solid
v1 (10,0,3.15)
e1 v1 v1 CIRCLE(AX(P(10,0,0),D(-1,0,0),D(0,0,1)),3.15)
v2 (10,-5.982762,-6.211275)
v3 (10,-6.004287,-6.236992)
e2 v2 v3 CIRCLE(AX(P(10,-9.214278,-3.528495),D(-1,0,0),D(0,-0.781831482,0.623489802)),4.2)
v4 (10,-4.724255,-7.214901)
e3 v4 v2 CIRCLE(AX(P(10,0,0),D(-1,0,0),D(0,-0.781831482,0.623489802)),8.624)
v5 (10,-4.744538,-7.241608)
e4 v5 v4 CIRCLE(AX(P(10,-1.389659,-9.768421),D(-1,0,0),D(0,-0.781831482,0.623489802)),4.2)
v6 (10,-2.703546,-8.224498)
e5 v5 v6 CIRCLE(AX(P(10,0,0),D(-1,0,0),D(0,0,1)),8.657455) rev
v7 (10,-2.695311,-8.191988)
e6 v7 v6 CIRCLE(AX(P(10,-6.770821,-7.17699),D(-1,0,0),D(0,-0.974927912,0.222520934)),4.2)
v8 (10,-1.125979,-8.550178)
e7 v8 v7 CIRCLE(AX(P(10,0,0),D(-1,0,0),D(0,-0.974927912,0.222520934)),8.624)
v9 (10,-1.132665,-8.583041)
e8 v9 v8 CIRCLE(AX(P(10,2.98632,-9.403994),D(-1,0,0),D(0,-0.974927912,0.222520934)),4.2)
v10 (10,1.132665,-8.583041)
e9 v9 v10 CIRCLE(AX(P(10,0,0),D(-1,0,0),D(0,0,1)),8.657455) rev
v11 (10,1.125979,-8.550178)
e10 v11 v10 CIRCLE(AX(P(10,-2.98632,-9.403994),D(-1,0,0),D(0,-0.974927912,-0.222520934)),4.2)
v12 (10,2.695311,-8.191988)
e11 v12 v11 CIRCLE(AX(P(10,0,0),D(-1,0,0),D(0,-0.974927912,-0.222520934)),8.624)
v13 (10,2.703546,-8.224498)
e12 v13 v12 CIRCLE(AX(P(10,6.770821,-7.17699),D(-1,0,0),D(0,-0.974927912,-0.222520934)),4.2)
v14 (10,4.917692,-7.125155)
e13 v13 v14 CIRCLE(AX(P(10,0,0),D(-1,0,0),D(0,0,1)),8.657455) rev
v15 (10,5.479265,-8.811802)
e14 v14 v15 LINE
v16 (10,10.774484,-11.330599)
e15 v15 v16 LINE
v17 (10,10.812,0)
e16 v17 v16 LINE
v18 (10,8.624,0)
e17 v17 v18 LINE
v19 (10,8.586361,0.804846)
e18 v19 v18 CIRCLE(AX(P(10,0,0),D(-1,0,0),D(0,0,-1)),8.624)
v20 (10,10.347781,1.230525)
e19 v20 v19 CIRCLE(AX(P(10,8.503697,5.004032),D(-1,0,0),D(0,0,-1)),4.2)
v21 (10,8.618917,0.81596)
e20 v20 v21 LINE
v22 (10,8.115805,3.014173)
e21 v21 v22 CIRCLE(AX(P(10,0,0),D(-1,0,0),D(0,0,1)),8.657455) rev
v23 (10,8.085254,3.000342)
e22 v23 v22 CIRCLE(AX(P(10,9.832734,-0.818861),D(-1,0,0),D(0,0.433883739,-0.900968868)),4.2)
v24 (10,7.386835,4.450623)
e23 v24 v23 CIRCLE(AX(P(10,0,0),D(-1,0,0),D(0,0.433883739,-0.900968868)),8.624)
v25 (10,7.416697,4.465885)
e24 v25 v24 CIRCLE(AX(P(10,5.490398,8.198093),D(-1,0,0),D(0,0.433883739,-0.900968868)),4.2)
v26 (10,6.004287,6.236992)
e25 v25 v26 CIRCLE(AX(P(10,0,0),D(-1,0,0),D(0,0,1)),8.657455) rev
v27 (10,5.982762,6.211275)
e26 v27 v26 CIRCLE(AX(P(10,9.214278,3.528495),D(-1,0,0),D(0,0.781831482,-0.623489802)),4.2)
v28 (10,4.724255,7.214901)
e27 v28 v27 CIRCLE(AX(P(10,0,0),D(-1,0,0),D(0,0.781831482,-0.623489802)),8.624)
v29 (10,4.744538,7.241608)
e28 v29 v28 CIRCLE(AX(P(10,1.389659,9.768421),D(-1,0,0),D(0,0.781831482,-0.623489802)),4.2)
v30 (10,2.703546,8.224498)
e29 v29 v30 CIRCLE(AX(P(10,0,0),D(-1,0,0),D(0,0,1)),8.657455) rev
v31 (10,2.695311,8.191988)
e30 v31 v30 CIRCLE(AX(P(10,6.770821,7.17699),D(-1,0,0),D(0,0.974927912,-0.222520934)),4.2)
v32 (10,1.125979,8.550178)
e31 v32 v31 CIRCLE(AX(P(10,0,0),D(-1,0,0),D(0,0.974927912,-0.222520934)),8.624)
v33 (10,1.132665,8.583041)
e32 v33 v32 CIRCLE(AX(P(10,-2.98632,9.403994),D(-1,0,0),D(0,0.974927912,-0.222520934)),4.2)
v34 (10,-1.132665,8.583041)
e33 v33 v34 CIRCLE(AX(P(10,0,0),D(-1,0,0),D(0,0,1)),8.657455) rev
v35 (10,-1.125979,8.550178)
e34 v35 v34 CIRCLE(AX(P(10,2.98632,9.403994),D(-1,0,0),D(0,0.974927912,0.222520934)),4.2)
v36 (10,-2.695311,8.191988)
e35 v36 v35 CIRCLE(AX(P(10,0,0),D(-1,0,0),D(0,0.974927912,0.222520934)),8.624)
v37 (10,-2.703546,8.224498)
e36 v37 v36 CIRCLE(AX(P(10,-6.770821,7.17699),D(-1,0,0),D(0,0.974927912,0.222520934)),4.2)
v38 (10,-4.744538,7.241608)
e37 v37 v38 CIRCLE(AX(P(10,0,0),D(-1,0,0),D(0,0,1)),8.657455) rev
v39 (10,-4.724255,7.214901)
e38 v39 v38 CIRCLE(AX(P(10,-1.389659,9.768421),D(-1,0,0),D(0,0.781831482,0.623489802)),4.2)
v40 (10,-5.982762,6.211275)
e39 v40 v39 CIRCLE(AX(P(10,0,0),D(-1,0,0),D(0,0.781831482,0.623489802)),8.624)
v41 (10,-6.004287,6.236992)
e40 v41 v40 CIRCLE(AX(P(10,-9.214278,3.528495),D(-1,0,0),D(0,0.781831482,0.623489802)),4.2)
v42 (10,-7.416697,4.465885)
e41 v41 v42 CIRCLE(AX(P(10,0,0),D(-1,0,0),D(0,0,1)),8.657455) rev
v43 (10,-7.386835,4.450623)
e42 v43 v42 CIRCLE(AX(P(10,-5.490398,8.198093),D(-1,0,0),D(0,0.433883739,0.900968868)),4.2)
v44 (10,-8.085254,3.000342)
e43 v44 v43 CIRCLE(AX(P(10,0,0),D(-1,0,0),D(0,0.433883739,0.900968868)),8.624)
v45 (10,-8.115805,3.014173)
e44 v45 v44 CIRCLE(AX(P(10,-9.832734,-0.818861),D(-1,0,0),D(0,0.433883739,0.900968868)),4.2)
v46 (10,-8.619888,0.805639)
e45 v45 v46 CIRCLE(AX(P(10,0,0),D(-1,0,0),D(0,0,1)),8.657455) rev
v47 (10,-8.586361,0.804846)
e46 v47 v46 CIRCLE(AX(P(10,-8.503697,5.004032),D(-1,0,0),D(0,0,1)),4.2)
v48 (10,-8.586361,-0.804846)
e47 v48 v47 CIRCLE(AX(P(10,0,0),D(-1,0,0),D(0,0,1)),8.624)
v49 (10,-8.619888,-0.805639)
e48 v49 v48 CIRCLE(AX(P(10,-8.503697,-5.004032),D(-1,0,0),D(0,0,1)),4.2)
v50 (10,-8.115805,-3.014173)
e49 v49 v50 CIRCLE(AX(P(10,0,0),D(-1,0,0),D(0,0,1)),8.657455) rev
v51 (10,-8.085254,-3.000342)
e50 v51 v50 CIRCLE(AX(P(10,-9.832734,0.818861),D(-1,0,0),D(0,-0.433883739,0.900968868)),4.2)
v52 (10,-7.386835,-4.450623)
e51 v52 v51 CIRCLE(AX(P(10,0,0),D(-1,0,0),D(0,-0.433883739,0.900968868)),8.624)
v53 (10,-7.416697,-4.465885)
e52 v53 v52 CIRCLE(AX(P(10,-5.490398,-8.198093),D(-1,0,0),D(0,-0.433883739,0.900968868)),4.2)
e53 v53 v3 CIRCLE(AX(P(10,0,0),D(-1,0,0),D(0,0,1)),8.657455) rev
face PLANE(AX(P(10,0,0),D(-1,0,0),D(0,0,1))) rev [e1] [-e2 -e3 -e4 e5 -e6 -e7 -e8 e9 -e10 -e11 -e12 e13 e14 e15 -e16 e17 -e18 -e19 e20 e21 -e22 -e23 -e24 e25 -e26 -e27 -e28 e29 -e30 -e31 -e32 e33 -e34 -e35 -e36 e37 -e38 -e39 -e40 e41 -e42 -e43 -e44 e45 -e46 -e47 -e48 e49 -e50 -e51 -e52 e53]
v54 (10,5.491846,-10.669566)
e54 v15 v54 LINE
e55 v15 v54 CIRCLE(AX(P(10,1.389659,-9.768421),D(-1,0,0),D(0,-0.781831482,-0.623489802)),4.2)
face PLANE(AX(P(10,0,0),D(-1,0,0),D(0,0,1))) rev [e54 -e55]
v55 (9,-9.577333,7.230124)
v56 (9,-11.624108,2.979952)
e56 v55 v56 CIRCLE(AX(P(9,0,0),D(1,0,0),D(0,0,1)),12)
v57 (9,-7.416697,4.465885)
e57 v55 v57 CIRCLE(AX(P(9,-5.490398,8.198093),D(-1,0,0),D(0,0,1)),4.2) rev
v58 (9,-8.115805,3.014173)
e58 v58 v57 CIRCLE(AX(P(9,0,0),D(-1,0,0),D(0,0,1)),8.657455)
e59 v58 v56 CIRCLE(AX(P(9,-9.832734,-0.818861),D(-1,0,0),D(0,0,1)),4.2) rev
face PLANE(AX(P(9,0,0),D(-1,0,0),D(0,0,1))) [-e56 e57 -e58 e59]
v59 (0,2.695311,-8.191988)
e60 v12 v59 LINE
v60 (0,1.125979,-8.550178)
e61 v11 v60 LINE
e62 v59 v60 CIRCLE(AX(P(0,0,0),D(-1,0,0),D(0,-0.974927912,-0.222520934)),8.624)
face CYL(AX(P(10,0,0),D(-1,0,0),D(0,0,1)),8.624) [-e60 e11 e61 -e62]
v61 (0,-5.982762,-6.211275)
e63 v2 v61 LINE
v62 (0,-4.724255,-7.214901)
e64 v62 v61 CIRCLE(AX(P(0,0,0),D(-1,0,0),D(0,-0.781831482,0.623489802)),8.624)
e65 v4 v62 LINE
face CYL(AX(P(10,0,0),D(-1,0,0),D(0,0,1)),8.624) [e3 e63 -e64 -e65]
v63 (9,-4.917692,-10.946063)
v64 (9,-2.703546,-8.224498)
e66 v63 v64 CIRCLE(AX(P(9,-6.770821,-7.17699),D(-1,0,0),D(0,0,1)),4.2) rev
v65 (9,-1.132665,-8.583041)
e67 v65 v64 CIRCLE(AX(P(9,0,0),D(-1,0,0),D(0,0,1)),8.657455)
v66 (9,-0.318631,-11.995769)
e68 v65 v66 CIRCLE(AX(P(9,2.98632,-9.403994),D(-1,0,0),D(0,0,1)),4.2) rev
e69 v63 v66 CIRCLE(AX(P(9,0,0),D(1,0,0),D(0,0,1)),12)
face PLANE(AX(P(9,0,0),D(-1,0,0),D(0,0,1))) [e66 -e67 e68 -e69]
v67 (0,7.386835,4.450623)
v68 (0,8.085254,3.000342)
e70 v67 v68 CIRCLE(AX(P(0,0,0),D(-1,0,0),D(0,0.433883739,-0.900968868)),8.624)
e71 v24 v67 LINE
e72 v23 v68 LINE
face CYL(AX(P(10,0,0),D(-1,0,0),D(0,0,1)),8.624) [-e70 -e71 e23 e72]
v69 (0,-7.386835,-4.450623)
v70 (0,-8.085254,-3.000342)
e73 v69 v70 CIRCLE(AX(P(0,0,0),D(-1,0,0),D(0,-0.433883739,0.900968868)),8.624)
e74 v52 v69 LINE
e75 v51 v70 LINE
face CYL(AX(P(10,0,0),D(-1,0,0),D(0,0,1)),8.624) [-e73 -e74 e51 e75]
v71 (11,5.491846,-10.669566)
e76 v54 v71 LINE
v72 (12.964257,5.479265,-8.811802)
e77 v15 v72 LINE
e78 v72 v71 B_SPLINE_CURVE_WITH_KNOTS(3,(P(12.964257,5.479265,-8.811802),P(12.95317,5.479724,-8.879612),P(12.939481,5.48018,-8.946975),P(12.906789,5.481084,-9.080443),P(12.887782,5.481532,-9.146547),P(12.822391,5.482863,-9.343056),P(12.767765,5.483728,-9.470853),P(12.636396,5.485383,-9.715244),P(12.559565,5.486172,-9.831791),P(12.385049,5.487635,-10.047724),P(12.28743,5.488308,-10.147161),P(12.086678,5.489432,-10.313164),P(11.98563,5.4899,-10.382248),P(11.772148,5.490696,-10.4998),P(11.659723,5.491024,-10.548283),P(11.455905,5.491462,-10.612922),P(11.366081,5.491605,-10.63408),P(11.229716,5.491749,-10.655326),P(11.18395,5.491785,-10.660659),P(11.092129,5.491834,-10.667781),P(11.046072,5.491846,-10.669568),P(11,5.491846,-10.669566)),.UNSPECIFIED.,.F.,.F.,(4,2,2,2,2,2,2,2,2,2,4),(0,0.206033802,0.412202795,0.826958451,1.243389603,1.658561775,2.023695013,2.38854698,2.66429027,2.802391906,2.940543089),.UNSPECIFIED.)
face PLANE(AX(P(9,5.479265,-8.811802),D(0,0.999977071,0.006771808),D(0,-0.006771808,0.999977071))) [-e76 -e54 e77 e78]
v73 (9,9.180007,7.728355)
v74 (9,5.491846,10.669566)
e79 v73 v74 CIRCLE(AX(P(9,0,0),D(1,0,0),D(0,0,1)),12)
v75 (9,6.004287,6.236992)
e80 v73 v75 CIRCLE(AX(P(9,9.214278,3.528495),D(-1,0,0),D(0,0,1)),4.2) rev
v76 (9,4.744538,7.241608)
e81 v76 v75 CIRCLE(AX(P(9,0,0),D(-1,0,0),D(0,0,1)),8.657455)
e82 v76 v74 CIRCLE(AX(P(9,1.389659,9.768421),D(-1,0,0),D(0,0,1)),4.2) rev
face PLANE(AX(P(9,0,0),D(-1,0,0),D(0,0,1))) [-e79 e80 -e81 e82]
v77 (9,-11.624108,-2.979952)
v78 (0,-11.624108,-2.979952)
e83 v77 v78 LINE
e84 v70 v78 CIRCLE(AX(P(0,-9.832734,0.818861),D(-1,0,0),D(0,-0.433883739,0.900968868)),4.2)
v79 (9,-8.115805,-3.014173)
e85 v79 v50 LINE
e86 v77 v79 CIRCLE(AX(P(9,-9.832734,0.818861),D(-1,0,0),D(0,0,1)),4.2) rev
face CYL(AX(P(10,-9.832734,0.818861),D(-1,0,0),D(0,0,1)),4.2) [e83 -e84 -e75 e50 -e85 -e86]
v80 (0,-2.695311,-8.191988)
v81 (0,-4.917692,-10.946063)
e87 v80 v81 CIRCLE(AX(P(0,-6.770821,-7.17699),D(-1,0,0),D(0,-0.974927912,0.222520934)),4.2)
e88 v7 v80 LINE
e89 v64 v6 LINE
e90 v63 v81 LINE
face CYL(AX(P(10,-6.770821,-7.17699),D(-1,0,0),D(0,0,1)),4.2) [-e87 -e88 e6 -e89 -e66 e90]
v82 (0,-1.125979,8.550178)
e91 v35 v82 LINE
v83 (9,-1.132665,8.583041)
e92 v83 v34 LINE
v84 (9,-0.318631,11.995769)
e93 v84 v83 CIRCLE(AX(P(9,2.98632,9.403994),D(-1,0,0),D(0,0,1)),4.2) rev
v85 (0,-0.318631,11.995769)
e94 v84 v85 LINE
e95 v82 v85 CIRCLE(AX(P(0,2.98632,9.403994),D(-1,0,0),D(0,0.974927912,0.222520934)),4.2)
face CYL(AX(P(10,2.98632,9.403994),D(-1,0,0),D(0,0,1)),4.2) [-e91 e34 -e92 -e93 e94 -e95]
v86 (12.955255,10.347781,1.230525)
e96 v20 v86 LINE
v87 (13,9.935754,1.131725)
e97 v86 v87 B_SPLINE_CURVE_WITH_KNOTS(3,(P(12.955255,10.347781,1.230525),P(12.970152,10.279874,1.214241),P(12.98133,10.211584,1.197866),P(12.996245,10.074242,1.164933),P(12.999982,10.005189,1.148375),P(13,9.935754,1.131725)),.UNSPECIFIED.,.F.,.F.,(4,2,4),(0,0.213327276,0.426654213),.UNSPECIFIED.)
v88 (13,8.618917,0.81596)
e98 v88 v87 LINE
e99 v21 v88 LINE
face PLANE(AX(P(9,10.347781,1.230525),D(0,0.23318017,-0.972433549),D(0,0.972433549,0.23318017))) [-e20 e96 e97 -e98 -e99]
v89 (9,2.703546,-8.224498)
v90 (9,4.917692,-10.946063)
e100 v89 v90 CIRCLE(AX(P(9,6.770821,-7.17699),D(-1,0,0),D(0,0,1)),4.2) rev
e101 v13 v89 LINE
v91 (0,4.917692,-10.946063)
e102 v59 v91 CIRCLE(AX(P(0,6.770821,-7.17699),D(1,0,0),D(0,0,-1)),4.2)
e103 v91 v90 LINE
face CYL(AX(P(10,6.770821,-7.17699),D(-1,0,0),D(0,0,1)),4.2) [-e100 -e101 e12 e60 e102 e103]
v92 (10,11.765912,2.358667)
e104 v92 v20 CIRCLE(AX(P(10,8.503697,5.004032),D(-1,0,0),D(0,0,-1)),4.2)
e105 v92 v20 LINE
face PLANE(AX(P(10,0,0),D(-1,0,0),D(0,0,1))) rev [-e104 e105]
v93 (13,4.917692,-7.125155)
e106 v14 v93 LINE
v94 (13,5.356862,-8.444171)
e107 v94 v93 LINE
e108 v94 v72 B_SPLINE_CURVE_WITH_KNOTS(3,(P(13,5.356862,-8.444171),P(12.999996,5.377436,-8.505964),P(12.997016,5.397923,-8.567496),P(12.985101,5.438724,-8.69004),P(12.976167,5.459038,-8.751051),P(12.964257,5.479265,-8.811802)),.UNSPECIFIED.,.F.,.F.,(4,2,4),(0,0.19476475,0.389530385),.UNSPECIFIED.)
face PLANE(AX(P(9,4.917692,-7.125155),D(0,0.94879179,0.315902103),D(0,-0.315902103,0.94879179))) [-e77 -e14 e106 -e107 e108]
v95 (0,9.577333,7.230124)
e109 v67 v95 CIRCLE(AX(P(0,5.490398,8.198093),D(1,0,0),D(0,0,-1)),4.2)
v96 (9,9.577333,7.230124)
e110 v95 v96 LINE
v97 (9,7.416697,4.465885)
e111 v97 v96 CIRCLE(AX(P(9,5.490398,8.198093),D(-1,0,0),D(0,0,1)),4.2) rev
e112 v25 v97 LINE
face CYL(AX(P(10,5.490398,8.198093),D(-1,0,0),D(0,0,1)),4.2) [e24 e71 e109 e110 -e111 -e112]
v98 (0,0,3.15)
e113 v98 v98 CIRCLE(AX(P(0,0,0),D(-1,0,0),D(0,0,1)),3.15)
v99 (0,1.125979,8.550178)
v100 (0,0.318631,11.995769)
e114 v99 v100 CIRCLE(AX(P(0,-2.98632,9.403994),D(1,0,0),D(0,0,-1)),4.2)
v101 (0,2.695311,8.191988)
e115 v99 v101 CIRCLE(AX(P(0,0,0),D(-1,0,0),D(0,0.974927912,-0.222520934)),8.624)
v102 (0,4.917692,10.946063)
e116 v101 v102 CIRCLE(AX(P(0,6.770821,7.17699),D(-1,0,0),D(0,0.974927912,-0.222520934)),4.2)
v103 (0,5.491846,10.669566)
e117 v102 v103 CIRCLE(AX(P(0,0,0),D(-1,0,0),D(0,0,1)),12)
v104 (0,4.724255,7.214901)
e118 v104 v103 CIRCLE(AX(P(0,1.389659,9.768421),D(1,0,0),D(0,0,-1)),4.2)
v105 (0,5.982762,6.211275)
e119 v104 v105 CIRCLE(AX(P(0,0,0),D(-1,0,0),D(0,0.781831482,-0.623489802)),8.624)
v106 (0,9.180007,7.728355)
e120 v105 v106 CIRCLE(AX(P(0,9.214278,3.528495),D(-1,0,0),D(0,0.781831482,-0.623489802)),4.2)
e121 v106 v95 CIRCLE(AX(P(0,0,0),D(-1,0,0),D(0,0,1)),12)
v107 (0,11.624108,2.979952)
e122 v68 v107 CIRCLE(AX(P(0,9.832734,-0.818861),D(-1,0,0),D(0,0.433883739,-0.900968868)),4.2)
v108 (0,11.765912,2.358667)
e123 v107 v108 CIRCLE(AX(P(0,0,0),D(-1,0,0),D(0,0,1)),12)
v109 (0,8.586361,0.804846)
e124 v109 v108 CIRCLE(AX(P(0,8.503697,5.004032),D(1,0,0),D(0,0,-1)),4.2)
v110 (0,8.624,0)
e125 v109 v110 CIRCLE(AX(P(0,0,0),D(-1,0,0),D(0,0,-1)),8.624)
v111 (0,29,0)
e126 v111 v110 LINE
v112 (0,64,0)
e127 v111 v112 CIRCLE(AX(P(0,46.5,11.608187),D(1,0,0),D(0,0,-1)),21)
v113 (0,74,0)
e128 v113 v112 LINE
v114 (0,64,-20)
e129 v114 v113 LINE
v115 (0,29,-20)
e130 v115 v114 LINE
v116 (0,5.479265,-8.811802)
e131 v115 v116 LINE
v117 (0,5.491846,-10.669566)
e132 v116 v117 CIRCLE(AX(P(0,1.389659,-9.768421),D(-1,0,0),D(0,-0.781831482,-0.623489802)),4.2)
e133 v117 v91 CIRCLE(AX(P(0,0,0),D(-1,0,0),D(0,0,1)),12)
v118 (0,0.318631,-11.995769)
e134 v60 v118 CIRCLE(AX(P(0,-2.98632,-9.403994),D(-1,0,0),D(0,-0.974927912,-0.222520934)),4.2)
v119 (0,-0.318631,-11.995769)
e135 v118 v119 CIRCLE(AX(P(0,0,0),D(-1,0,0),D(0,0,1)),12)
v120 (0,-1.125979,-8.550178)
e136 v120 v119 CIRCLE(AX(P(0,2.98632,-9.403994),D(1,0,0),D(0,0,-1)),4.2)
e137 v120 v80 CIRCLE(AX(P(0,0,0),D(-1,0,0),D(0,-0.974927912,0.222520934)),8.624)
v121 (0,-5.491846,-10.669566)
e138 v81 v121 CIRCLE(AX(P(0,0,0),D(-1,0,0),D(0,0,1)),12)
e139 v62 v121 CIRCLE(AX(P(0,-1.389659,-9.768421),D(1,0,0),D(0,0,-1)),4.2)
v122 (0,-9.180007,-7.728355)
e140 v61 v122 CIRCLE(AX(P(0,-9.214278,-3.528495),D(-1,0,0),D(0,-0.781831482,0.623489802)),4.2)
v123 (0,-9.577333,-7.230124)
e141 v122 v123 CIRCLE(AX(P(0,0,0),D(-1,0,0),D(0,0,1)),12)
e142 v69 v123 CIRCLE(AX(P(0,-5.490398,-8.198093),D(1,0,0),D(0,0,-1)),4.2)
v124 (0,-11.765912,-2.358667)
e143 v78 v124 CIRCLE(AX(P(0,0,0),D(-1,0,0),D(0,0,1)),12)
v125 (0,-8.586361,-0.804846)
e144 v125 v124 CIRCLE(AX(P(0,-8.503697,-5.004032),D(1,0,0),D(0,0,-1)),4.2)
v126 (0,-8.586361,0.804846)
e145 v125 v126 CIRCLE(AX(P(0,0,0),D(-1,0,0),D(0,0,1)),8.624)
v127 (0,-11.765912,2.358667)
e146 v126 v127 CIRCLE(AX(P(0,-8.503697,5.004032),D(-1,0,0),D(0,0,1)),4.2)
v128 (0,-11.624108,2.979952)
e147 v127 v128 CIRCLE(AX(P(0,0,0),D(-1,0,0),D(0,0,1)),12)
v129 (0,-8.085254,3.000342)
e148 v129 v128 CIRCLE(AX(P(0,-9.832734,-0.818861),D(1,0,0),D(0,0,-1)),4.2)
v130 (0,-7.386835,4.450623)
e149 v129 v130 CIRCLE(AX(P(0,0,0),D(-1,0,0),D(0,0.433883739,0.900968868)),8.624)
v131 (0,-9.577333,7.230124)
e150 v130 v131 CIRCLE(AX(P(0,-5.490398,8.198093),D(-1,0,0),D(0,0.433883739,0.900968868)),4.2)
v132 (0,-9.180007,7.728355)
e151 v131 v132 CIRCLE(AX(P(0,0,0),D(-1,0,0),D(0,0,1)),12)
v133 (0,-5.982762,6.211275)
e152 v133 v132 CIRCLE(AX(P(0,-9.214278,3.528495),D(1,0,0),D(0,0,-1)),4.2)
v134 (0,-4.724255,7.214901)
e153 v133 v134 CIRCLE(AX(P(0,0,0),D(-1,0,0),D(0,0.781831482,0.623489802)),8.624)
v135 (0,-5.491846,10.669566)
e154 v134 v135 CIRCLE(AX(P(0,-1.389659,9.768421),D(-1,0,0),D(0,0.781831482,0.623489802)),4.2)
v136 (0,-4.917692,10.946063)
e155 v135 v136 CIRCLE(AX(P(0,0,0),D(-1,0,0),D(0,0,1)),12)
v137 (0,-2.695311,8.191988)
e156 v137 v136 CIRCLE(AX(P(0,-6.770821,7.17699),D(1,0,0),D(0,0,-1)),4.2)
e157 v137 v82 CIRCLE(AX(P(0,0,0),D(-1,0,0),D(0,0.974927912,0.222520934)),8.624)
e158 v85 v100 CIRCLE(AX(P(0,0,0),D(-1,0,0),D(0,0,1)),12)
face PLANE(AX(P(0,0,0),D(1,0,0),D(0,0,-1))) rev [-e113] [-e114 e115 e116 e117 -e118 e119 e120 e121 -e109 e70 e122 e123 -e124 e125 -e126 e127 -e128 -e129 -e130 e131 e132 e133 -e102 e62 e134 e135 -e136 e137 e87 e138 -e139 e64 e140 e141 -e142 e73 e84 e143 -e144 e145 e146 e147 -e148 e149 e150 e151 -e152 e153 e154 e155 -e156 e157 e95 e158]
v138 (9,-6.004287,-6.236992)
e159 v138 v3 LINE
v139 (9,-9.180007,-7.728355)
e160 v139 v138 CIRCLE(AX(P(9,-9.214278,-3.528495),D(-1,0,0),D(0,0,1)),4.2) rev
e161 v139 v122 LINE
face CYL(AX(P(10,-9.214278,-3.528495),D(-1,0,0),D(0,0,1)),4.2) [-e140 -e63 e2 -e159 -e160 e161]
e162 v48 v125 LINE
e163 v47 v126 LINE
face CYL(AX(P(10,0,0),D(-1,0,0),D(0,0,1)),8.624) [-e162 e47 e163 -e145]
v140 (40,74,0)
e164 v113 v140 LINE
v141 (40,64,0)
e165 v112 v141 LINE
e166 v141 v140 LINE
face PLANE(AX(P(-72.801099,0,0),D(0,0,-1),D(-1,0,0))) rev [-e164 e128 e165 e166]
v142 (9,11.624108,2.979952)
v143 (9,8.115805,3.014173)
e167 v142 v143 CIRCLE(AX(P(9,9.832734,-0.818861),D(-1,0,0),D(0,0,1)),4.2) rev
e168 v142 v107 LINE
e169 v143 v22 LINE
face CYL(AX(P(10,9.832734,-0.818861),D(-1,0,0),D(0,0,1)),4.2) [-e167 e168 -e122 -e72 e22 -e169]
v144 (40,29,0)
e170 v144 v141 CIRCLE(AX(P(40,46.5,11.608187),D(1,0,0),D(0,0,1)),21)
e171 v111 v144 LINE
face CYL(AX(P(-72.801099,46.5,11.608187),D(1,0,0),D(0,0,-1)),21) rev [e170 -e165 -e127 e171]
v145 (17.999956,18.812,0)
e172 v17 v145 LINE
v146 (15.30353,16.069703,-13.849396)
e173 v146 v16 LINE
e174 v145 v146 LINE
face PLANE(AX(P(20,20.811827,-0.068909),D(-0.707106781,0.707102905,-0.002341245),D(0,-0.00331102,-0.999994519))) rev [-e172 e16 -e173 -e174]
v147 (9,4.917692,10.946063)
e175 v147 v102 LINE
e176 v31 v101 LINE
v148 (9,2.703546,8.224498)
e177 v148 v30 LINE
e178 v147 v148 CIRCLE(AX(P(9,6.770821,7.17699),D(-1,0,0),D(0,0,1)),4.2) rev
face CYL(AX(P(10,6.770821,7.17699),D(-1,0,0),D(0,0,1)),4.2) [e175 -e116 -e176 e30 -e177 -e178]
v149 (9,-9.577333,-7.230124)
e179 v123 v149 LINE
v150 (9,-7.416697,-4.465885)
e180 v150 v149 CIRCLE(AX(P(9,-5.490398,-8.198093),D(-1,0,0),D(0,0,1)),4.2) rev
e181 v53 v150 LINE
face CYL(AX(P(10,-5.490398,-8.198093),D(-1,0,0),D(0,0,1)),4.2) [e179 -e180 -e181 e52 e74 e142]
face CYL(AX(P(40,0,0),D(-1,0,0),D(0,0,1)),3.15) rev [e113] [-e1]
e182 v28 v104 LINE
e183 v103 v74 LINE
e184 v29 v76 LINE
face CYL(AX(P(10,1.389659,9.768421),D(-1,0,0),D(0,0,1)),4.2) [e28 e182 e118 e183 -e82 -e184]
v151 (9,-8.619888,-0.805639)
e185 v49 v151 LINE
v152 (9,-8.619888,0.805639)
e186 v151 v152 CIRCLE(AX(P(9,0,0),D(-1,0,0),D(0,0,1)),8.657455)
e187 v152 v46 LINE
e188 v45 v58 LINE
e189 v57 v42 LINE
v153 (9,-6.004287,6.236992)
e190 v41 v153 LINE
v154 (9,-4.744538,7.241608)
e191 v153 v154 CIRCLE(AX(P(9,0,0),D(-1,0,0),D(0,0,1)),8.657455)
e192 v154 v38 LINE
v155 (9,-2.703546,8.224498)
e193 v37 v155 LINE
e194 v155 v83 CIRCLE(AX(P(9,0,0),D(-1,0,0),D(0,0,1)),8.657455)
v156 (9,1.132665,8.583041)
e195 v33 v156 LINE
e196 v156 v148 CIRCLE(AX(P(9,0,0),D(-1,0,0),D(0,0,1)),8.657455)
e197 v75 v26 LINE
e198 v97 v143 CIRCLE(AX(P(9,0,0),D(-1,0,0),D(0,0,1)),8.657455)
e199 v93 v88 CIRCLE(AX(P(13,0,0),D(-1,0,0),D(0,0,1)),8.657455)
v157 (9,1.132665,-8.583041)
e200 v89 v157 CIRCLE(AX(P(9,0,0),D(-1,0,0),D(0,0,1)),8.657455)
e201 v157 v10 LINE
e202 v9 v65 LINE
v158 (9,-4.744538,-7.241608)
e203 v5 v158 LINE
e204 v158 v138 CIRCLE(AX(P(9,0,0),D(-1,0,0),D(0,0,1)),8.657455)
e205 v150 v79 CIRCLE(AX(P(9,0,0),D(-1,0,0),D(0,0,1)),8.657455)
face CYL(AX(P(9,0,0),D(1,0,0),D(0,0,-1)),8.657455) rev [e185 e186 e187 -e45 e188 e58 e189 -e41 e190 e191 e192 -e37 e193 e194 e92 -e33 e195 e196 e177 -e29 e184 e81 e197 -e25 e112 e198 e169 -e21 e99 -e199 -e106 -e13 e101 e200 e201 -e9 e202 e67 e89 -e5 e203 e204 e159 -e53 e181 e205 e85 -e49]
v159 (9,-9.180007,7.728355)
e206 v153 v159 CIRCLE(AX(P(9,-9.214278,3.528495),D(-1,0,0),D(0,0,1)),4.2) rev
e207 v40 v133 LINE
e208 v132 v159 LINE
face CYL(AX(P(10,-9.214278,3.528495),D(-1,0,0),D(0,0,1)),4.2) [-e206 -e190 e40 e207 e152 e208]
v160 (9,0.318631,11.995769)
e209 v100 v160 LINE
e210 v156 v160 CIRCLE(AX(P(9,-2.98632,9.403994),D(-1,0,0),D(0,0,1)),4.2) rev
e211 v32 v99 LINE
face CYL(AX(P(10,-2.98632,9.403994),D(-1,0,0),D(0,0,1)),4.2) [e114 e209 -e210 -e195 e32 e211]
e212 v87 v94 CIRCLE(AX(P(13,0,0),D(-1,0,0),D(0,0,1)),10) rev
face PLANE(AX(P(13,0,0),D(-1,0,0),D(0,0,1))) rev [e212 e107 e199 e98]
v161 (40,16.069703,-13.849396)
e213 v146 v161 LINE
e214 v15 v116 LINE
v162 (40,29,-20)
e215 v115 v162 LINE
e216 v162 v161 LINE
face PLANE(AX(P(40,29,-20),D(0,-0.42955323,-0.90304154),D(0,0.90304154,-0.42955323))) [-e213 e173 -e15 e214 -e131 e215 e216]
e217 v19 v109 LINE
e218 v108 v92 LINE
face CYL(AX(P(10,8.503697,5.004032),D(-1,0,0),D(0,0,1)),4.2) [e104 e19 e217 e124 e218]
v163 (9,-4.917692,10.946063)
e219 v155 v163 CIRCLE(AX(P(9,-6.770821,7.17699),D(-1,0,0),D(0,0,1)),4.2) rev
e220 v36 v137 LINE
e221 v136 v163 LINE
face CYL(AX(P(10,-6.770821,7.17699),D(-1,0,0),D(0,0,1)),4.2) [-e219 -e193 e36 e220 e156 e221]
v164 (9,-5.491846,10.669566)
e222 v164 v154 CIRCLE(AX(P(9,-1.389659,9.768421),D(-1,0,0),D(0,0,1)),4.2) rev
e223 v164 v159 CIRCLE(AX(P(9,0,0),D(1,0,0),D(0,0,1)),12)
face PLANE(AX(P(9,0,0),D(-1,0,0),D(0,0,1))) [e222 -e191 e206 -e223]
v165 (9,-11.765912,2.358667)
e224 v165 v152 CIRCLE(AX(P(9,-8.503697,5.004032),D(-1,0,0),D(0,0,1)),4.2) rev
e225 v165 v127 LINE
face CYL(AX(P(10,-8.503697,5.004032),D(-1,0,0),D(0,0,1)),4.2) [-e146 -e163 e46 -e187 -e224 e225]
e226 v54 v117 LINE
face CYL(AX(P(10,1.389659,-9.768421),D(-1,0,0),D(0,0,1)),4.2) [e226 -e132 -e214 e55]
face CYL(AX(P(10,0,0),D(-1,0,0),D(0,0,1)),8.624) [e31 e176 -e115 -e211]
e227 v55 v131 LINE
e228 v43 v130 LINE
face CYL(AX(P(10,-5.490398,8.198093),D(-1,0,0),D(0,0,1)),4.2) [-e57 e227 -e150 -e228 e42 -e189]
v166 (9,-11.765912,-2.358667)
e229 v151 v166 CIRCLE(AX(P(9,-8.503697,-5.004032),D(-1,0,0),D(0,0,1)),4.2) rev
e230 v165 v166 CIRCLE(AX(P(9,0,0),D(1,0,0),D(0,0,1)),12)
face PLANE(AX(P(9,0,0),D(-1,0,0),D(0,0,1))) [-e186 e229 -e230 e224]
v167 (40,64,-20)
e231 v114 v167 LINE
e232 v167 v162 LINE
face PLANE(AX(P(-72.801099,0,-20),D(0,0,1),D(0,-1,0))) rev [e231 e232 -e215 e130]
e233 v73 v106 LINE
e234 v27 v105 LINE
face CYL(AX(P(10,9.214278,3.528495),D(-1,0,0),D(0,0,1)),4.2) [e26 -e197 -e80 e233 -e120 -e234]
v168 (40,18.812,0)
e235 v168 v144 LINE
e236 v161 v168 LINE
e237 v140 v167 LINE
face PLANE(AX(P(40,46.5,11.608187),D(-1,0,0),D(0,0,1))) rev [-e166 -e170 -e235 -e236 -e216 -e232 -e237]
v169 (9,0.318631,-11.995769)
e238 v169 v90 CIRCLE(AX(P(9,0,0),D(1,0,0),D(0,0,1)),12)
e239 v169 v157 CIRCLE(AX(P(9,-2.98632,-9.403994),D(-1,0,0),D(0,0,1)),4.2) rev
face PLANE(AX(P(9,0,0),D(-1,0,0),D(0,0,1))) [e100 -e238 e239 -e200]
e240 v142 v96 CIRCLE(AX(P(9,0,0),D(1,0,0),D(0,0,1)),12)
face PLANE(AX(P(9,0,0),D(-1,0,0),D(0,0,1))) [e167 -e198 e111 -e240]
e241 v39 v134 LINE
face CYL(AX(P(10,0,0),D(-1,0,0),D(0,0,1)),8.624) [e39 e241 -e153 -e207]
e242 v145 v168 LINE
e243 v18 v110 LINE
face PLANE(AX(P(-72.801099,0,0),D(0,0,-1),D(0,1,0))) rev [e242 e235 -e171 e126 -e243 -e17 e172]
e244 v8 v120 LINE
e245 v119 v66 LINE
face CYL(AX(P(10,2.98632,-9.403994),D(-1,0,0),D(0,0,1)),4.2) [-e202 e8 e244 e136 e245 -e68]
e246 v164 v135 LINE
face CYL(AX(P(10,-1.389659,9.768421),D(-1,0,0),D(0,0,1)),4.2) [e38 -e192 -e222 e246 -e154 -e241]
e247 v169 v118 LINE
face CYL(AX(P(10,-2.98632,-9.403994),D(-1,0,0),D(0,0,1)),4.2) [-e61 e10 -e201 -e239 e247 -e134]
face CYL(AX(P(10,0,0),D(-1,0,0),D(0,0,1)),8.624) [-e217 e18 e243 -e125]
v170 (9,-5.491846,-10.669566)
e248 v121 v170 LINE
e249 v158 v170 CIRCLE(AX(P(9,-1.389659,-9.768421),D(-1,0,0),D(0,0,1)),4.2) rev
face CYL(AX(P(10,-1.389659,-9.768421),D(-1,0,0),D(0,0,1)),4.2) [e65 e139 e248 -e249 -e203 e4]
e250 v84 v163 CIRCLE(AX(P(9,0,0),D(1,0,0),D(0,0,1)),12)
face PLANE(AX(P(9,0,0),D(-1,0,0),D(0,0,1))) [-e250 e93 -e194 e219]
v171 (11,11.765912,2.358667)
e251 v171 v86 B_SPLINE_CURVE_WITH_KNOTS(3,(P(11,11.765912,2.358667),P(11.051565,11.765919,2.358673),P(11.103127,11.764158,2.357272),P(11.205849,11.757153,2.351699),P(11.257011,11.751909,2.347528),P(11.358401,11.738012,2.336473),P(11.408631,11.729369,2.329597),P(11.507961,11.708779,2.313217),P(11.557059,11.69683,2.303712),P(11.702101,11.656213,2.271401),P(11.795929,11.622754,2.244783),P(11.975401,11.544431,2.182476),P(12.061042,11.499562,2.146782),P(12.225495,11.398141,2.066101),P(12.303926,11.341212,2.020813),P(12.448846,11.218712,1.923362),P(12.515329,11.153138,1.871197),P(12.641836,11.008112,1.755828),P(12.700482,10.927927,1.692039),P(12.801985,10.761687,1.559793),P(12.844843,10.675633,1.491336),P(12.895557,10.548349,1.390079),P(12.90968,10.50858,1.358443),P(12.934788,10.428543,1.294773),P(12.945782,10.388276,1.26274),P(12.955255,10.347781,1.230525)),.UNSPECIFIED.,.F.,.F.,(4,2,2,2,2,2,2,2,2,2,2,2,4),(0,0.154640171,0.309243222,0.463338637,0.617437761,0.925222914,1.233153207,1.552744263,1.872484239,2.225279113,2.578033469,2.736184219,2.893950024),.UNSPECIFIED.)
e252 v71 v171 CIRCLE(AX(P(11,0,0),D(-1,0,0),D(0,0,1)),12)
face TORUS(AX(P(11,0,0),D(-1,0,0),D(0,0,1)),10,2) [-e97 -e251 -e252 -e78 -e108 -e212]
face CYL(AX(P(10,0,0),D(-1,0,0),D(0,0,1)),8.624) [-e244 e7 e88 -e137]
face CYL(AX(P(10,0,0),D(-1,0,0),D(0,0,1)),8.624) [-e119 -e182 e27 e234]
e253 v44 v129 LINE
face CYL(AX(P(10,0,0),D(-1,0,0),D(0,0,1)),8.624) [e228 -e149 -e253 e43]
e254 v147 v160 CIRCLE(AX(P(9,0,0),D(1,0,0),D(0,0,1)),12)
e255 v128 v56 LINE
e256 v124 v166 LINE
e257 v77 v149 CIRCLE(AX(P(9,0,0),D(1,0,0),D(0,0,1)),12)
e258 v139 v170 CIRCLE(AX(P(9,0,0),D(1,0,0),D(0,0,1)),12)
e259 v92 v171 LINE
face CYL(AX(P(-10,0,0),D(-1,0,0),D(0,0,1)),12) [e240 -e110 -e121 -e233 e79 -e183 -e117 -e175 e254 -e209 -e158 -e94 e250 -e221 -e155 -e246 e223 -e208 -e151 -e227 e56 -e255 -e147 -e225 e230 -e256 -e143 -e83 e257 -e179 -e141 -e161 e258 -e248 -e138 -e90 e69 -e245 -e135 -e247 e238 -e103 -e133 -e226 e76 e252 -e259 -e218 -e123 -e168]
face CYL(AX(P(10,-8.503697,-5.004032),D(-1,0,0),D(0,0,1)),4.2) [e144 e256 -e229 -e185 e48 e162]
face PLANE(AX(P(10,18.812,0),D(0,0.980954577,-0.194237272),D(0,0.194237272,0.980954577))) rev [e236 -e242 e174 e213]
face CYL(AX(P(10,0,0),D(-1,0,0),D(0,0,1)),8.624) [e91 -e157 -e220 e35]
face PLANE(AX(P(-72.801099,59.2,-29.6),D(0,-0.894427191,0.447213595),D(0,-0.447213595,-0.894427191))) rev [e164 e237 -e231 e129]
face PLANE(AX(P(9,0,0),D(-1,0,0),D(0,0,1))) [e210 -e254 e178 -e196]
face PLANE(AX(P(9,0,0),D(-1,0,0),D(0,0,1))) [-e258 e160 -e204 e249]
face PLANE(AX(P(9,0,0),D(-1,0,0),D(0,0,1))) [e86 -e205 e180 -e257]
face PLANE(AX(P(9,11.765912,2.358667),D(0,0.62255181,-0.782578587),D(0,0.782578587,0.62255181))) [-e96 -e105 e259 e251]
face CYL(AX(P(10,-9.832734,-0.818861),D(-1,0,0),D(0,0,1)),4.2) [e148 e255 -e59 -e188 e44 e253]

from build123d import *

# Parameters (mm, degrees)
BASPROSKE_W              = 10
BASPROSKE_H              = 12
TOOTHCUT_DEPTH           = 20.697716
TEETHCUTS_COUNT          = 14
TEETHCUTS_ANGLE          = 334.285714
BORSKE_R                 = 1.5
BORE_DEPTH               = 50.000051
BOSS_EXTRUDE1_DEPTH      = 10
BOSS_EXTRUDE2_START      = -40
BOSS_EXTRUDE2_DEPTH      = 40
CUT_EXTRUDE5_DEPTH       = 30
BOSS_EXTRUDE5_DEPTH      = 10
CHAMFER1_SIZE            = 10
BOSS_EXTRUDE6_DEPTH      = 3
BOSS_EXTRUDE6_DEPTH_BACK = 1
FILLET1_R                = 2
SKETCH12_R               = 3.15
CUT_EXTRUDE6_DEPTH       = 87.463865


with BuildPart() as part:
    # BasProSke → Base-Revolve (revolve)
    with BuildSketch(Plane(origin=(0, 0, 0), x_dir=(1, 0, 0), z_dir=(0, 1, 0)), mode=Mode.PRIVATE) as base_revolve_sk:
        with Locations((5, 6)):
            Rectangle(BASPROSKE_W, BASPROSKE_H)
    revolve(base_revolve_sk.sketch.rotate(Axis((-10, 0, 0), (1, 0, 0)), 180), axis=Axis((-10, 0, 0), (1, 0, 0)))

    # TooCutSke → ToothCut (cut, through all)
    with BuildSketch(Plane(origin=(0, 0, 0), x_dir=(0, 0, -1), z_dir=(1, 0, 0))):
        with BuildLine():
            ThreePointArc((0.804846, 8.586361), (0, 8.624), (-0.804846, 8.586361))
            ThreePointArc((-0.804846, 8.586361), (-1.237812, 10.362618), (-2.384428, 11.786634))
            ThreePointArc((-2.384428, 11.786634), (0, 12.0254), (2.384428, 11.786634))
            ThreePointArc((2.384428, 11.786634), (1.237812, 10.362618), (0.804846, 8.586361))
        make_face()
    toothcut = extrude(amount=TOOTHCUT_DEPTH, mode=Mode.SUBTRACT)

    # TeethCuts: ToothCut ×14 about axis
    teethcuts_axis = Axis((-10, 0, 0), (1, 0, 0))
    for i in range(1, TEETHCUTS_COUNT):
        add(toothcut.rotate(teethcuts_axis, i * TEETHCUTS_ANGLE / (TEETHCUTS_COUNT - 1)), mode=Mode.SUBTRACT)

    # BorSke → Bore (cut, symmetric)
    with BuildSketch(Plane(origin=(0, 0, 0), x_dir=(0, 0, -1), z_dir=(1, 0, 0))):
        with Locations(Location((0, 0, 0), (0, 0, 180))):
            Circle(BORSKE_R)
    extrude(amount=BORE_DEPTH, both=True, mode=Mode.SUBTRACT)

    # Sketch1 → Boss-Extrude1 (add)
    with BuildSketch(Plane(origin=(10, 0, 0), x_dir=(0, 0, -1), z_dir=(1, 0, 0))):
        with BuildLine():
            Line((0, 29), (0, 4))
            Line((0, 4), (8, 4))
            Line((8, 4), (20, 29))
            Line((20, 29), (20, 64))
            Line((20, 64), (0, 74))
            Line((0, 74), (0, 64))
            ThreePointArc((0, 64), (9.391813, 46.5), (0, 29))
        make_face()
    extrude(amount=-BOSS_EXTRUDE1_DEPTH)

    # Sketch2 → Boss-Extrude2 (add)
    with BuildSketch(Plane.ZY.offset(BOSS_EXTRUDE2_START)):
        with BuildLine():
            Line((-20, 29), (-7.698792, 3.139406))
            Line((-7.698792, 3.139406), (0, 8.624))
            Line((0, 8.624), (0, 29))
            ThreePointArc((0, 29), (-9.391813, 46.5), (0, 64))
            Line((0, 64), (0, 74))
            Line((0, 74), (-20, 64))
            Line((-20, 64), (-20, 29))
        make_face()
    extrude(amount=BOSS_EXTRUDE2_DEPTH)

    # Sketch9 → Cut-Extrude5 (cut)
    with BuildSketch(Plane(origin=(40, 0, 0), x_dir=(0, 0, -1), z_dir=(1, 0, 0))):
        Polygon((7.698792, 3.139406), (0, 8.624), (0, 18.812), (13.849396, 16.069703), align=None)
    extrude(amount=-CUT_EXTRUDE5_DEPTH, mode=Mode.SUBTRACT)

    # Sketch10 → Boss-Extrude5 (add)
    with BuildSketch(Plane(origin=(10, 0, 0), x_dir=(0, 0, -1), z_dir=(1, 0, 0))):
        Polygon((0, 18.812), (0, 10.812), (11.330599, 10.774484), (15.153835, 18.812), align=None)
    extrude(amount=BOSS_EXTRUDE5_DEPTH)

    # Chamfer1
    # the kernel refuses this chamfer: 10 mm, written as the material it takes off along each edge
    with BuildSketch(Plane(origin=(20, 10.897149, 25.716689), x_dir=(0.027495876610586313, 0.9996164375424699, -0.003309768015556128), z_dir=(0, -0.0033110198561701067, -0.999994518558733))) as chamfer1_piece_1_section:
        Polygon((CHAMFER1_SIZE * 0.999621916911, -CHAMFER1_SIZE * 0.0274958766106), (-CHAMFER1_SIZE * 0.0274958766106, -CHAMFER1_SIZE * 0.999621916911), (0, 0), align=None)
    chamfer1_piece_1 = extrude(amount=62.764321, mode=Mode.PRIVATE)
    chamfer1_piece_1 = split(chamfer1_piece_1, bisect_by=Plane(origin=(16.383831, 18.515288, -1.498481), z_dir=(0, -0.980954576947178, 0.19423727234077168)), keep=Keep.TOP, mode=Mode.PRIVATE)
    chamfer1_piece_1 = split(chamfer1_piece_1, bisect_by=Plane(origin=(10, 13.486301, -0.502699), z_dir=(1, 0, 0)), keep=Keep.TOP, mode=Mode.PRIVATE)
    add(chamfer1_piece_1, mode=Mode.SUBTRACT)

    # Sketch11 → Boss-Extrude6 (add, two sides: drawn at the far end of the back side and taken through both)
    with BuildSketch(Plane(origin=(10, 0, 0), x_dir=(0, 0, -1), z_dir=(1, 0, 0)).offset(-BOSS_EXTRUDE6_DEPTH_BACK)):
        with BuildLine():
            Line((-2.358667, 11.765912), (-1.230525, 10.347781))
            Line((-1.230525, 10.347781), (-0.81596, 8.618917))
            ThreePointArc((-0.81596, 8.618917), (-3.657356, -7.846992), (7.125155, 4.917692))
            Line((7.125155, 4.917692), (8.811802, 5.479265))
            Line((8.811802, 5.479265), (10.669566, 5.491846))
            ThreePointArc((10.669566, 5.491846), (-5.206605, -10.811626), (-2.358667, 11.765912))
        make_face()
    extrude(amount=BOSS_EXTRUDE6_DEPTH + BOSS_EXTRUDE6_DEPTH_BACK)

    # Fillet1
    fillet1_edges = [part.edges().sort_by_distance(p)[0] for p in [
        (13, -10.811626, 5.206605),
    ]]
    fillet(fillet1_edges, radius=FILLET1_R)

    # Sketch12 → Cut-Extrude6 (cut, through all)
    with BuildSketch(Plane.ZY):
        Circle(SKETCH12_R)
    extrude(amount=-CUT_EXTRUDE6_DEPTH, mode=Mode.SUBTRACT)


solid = part.part
